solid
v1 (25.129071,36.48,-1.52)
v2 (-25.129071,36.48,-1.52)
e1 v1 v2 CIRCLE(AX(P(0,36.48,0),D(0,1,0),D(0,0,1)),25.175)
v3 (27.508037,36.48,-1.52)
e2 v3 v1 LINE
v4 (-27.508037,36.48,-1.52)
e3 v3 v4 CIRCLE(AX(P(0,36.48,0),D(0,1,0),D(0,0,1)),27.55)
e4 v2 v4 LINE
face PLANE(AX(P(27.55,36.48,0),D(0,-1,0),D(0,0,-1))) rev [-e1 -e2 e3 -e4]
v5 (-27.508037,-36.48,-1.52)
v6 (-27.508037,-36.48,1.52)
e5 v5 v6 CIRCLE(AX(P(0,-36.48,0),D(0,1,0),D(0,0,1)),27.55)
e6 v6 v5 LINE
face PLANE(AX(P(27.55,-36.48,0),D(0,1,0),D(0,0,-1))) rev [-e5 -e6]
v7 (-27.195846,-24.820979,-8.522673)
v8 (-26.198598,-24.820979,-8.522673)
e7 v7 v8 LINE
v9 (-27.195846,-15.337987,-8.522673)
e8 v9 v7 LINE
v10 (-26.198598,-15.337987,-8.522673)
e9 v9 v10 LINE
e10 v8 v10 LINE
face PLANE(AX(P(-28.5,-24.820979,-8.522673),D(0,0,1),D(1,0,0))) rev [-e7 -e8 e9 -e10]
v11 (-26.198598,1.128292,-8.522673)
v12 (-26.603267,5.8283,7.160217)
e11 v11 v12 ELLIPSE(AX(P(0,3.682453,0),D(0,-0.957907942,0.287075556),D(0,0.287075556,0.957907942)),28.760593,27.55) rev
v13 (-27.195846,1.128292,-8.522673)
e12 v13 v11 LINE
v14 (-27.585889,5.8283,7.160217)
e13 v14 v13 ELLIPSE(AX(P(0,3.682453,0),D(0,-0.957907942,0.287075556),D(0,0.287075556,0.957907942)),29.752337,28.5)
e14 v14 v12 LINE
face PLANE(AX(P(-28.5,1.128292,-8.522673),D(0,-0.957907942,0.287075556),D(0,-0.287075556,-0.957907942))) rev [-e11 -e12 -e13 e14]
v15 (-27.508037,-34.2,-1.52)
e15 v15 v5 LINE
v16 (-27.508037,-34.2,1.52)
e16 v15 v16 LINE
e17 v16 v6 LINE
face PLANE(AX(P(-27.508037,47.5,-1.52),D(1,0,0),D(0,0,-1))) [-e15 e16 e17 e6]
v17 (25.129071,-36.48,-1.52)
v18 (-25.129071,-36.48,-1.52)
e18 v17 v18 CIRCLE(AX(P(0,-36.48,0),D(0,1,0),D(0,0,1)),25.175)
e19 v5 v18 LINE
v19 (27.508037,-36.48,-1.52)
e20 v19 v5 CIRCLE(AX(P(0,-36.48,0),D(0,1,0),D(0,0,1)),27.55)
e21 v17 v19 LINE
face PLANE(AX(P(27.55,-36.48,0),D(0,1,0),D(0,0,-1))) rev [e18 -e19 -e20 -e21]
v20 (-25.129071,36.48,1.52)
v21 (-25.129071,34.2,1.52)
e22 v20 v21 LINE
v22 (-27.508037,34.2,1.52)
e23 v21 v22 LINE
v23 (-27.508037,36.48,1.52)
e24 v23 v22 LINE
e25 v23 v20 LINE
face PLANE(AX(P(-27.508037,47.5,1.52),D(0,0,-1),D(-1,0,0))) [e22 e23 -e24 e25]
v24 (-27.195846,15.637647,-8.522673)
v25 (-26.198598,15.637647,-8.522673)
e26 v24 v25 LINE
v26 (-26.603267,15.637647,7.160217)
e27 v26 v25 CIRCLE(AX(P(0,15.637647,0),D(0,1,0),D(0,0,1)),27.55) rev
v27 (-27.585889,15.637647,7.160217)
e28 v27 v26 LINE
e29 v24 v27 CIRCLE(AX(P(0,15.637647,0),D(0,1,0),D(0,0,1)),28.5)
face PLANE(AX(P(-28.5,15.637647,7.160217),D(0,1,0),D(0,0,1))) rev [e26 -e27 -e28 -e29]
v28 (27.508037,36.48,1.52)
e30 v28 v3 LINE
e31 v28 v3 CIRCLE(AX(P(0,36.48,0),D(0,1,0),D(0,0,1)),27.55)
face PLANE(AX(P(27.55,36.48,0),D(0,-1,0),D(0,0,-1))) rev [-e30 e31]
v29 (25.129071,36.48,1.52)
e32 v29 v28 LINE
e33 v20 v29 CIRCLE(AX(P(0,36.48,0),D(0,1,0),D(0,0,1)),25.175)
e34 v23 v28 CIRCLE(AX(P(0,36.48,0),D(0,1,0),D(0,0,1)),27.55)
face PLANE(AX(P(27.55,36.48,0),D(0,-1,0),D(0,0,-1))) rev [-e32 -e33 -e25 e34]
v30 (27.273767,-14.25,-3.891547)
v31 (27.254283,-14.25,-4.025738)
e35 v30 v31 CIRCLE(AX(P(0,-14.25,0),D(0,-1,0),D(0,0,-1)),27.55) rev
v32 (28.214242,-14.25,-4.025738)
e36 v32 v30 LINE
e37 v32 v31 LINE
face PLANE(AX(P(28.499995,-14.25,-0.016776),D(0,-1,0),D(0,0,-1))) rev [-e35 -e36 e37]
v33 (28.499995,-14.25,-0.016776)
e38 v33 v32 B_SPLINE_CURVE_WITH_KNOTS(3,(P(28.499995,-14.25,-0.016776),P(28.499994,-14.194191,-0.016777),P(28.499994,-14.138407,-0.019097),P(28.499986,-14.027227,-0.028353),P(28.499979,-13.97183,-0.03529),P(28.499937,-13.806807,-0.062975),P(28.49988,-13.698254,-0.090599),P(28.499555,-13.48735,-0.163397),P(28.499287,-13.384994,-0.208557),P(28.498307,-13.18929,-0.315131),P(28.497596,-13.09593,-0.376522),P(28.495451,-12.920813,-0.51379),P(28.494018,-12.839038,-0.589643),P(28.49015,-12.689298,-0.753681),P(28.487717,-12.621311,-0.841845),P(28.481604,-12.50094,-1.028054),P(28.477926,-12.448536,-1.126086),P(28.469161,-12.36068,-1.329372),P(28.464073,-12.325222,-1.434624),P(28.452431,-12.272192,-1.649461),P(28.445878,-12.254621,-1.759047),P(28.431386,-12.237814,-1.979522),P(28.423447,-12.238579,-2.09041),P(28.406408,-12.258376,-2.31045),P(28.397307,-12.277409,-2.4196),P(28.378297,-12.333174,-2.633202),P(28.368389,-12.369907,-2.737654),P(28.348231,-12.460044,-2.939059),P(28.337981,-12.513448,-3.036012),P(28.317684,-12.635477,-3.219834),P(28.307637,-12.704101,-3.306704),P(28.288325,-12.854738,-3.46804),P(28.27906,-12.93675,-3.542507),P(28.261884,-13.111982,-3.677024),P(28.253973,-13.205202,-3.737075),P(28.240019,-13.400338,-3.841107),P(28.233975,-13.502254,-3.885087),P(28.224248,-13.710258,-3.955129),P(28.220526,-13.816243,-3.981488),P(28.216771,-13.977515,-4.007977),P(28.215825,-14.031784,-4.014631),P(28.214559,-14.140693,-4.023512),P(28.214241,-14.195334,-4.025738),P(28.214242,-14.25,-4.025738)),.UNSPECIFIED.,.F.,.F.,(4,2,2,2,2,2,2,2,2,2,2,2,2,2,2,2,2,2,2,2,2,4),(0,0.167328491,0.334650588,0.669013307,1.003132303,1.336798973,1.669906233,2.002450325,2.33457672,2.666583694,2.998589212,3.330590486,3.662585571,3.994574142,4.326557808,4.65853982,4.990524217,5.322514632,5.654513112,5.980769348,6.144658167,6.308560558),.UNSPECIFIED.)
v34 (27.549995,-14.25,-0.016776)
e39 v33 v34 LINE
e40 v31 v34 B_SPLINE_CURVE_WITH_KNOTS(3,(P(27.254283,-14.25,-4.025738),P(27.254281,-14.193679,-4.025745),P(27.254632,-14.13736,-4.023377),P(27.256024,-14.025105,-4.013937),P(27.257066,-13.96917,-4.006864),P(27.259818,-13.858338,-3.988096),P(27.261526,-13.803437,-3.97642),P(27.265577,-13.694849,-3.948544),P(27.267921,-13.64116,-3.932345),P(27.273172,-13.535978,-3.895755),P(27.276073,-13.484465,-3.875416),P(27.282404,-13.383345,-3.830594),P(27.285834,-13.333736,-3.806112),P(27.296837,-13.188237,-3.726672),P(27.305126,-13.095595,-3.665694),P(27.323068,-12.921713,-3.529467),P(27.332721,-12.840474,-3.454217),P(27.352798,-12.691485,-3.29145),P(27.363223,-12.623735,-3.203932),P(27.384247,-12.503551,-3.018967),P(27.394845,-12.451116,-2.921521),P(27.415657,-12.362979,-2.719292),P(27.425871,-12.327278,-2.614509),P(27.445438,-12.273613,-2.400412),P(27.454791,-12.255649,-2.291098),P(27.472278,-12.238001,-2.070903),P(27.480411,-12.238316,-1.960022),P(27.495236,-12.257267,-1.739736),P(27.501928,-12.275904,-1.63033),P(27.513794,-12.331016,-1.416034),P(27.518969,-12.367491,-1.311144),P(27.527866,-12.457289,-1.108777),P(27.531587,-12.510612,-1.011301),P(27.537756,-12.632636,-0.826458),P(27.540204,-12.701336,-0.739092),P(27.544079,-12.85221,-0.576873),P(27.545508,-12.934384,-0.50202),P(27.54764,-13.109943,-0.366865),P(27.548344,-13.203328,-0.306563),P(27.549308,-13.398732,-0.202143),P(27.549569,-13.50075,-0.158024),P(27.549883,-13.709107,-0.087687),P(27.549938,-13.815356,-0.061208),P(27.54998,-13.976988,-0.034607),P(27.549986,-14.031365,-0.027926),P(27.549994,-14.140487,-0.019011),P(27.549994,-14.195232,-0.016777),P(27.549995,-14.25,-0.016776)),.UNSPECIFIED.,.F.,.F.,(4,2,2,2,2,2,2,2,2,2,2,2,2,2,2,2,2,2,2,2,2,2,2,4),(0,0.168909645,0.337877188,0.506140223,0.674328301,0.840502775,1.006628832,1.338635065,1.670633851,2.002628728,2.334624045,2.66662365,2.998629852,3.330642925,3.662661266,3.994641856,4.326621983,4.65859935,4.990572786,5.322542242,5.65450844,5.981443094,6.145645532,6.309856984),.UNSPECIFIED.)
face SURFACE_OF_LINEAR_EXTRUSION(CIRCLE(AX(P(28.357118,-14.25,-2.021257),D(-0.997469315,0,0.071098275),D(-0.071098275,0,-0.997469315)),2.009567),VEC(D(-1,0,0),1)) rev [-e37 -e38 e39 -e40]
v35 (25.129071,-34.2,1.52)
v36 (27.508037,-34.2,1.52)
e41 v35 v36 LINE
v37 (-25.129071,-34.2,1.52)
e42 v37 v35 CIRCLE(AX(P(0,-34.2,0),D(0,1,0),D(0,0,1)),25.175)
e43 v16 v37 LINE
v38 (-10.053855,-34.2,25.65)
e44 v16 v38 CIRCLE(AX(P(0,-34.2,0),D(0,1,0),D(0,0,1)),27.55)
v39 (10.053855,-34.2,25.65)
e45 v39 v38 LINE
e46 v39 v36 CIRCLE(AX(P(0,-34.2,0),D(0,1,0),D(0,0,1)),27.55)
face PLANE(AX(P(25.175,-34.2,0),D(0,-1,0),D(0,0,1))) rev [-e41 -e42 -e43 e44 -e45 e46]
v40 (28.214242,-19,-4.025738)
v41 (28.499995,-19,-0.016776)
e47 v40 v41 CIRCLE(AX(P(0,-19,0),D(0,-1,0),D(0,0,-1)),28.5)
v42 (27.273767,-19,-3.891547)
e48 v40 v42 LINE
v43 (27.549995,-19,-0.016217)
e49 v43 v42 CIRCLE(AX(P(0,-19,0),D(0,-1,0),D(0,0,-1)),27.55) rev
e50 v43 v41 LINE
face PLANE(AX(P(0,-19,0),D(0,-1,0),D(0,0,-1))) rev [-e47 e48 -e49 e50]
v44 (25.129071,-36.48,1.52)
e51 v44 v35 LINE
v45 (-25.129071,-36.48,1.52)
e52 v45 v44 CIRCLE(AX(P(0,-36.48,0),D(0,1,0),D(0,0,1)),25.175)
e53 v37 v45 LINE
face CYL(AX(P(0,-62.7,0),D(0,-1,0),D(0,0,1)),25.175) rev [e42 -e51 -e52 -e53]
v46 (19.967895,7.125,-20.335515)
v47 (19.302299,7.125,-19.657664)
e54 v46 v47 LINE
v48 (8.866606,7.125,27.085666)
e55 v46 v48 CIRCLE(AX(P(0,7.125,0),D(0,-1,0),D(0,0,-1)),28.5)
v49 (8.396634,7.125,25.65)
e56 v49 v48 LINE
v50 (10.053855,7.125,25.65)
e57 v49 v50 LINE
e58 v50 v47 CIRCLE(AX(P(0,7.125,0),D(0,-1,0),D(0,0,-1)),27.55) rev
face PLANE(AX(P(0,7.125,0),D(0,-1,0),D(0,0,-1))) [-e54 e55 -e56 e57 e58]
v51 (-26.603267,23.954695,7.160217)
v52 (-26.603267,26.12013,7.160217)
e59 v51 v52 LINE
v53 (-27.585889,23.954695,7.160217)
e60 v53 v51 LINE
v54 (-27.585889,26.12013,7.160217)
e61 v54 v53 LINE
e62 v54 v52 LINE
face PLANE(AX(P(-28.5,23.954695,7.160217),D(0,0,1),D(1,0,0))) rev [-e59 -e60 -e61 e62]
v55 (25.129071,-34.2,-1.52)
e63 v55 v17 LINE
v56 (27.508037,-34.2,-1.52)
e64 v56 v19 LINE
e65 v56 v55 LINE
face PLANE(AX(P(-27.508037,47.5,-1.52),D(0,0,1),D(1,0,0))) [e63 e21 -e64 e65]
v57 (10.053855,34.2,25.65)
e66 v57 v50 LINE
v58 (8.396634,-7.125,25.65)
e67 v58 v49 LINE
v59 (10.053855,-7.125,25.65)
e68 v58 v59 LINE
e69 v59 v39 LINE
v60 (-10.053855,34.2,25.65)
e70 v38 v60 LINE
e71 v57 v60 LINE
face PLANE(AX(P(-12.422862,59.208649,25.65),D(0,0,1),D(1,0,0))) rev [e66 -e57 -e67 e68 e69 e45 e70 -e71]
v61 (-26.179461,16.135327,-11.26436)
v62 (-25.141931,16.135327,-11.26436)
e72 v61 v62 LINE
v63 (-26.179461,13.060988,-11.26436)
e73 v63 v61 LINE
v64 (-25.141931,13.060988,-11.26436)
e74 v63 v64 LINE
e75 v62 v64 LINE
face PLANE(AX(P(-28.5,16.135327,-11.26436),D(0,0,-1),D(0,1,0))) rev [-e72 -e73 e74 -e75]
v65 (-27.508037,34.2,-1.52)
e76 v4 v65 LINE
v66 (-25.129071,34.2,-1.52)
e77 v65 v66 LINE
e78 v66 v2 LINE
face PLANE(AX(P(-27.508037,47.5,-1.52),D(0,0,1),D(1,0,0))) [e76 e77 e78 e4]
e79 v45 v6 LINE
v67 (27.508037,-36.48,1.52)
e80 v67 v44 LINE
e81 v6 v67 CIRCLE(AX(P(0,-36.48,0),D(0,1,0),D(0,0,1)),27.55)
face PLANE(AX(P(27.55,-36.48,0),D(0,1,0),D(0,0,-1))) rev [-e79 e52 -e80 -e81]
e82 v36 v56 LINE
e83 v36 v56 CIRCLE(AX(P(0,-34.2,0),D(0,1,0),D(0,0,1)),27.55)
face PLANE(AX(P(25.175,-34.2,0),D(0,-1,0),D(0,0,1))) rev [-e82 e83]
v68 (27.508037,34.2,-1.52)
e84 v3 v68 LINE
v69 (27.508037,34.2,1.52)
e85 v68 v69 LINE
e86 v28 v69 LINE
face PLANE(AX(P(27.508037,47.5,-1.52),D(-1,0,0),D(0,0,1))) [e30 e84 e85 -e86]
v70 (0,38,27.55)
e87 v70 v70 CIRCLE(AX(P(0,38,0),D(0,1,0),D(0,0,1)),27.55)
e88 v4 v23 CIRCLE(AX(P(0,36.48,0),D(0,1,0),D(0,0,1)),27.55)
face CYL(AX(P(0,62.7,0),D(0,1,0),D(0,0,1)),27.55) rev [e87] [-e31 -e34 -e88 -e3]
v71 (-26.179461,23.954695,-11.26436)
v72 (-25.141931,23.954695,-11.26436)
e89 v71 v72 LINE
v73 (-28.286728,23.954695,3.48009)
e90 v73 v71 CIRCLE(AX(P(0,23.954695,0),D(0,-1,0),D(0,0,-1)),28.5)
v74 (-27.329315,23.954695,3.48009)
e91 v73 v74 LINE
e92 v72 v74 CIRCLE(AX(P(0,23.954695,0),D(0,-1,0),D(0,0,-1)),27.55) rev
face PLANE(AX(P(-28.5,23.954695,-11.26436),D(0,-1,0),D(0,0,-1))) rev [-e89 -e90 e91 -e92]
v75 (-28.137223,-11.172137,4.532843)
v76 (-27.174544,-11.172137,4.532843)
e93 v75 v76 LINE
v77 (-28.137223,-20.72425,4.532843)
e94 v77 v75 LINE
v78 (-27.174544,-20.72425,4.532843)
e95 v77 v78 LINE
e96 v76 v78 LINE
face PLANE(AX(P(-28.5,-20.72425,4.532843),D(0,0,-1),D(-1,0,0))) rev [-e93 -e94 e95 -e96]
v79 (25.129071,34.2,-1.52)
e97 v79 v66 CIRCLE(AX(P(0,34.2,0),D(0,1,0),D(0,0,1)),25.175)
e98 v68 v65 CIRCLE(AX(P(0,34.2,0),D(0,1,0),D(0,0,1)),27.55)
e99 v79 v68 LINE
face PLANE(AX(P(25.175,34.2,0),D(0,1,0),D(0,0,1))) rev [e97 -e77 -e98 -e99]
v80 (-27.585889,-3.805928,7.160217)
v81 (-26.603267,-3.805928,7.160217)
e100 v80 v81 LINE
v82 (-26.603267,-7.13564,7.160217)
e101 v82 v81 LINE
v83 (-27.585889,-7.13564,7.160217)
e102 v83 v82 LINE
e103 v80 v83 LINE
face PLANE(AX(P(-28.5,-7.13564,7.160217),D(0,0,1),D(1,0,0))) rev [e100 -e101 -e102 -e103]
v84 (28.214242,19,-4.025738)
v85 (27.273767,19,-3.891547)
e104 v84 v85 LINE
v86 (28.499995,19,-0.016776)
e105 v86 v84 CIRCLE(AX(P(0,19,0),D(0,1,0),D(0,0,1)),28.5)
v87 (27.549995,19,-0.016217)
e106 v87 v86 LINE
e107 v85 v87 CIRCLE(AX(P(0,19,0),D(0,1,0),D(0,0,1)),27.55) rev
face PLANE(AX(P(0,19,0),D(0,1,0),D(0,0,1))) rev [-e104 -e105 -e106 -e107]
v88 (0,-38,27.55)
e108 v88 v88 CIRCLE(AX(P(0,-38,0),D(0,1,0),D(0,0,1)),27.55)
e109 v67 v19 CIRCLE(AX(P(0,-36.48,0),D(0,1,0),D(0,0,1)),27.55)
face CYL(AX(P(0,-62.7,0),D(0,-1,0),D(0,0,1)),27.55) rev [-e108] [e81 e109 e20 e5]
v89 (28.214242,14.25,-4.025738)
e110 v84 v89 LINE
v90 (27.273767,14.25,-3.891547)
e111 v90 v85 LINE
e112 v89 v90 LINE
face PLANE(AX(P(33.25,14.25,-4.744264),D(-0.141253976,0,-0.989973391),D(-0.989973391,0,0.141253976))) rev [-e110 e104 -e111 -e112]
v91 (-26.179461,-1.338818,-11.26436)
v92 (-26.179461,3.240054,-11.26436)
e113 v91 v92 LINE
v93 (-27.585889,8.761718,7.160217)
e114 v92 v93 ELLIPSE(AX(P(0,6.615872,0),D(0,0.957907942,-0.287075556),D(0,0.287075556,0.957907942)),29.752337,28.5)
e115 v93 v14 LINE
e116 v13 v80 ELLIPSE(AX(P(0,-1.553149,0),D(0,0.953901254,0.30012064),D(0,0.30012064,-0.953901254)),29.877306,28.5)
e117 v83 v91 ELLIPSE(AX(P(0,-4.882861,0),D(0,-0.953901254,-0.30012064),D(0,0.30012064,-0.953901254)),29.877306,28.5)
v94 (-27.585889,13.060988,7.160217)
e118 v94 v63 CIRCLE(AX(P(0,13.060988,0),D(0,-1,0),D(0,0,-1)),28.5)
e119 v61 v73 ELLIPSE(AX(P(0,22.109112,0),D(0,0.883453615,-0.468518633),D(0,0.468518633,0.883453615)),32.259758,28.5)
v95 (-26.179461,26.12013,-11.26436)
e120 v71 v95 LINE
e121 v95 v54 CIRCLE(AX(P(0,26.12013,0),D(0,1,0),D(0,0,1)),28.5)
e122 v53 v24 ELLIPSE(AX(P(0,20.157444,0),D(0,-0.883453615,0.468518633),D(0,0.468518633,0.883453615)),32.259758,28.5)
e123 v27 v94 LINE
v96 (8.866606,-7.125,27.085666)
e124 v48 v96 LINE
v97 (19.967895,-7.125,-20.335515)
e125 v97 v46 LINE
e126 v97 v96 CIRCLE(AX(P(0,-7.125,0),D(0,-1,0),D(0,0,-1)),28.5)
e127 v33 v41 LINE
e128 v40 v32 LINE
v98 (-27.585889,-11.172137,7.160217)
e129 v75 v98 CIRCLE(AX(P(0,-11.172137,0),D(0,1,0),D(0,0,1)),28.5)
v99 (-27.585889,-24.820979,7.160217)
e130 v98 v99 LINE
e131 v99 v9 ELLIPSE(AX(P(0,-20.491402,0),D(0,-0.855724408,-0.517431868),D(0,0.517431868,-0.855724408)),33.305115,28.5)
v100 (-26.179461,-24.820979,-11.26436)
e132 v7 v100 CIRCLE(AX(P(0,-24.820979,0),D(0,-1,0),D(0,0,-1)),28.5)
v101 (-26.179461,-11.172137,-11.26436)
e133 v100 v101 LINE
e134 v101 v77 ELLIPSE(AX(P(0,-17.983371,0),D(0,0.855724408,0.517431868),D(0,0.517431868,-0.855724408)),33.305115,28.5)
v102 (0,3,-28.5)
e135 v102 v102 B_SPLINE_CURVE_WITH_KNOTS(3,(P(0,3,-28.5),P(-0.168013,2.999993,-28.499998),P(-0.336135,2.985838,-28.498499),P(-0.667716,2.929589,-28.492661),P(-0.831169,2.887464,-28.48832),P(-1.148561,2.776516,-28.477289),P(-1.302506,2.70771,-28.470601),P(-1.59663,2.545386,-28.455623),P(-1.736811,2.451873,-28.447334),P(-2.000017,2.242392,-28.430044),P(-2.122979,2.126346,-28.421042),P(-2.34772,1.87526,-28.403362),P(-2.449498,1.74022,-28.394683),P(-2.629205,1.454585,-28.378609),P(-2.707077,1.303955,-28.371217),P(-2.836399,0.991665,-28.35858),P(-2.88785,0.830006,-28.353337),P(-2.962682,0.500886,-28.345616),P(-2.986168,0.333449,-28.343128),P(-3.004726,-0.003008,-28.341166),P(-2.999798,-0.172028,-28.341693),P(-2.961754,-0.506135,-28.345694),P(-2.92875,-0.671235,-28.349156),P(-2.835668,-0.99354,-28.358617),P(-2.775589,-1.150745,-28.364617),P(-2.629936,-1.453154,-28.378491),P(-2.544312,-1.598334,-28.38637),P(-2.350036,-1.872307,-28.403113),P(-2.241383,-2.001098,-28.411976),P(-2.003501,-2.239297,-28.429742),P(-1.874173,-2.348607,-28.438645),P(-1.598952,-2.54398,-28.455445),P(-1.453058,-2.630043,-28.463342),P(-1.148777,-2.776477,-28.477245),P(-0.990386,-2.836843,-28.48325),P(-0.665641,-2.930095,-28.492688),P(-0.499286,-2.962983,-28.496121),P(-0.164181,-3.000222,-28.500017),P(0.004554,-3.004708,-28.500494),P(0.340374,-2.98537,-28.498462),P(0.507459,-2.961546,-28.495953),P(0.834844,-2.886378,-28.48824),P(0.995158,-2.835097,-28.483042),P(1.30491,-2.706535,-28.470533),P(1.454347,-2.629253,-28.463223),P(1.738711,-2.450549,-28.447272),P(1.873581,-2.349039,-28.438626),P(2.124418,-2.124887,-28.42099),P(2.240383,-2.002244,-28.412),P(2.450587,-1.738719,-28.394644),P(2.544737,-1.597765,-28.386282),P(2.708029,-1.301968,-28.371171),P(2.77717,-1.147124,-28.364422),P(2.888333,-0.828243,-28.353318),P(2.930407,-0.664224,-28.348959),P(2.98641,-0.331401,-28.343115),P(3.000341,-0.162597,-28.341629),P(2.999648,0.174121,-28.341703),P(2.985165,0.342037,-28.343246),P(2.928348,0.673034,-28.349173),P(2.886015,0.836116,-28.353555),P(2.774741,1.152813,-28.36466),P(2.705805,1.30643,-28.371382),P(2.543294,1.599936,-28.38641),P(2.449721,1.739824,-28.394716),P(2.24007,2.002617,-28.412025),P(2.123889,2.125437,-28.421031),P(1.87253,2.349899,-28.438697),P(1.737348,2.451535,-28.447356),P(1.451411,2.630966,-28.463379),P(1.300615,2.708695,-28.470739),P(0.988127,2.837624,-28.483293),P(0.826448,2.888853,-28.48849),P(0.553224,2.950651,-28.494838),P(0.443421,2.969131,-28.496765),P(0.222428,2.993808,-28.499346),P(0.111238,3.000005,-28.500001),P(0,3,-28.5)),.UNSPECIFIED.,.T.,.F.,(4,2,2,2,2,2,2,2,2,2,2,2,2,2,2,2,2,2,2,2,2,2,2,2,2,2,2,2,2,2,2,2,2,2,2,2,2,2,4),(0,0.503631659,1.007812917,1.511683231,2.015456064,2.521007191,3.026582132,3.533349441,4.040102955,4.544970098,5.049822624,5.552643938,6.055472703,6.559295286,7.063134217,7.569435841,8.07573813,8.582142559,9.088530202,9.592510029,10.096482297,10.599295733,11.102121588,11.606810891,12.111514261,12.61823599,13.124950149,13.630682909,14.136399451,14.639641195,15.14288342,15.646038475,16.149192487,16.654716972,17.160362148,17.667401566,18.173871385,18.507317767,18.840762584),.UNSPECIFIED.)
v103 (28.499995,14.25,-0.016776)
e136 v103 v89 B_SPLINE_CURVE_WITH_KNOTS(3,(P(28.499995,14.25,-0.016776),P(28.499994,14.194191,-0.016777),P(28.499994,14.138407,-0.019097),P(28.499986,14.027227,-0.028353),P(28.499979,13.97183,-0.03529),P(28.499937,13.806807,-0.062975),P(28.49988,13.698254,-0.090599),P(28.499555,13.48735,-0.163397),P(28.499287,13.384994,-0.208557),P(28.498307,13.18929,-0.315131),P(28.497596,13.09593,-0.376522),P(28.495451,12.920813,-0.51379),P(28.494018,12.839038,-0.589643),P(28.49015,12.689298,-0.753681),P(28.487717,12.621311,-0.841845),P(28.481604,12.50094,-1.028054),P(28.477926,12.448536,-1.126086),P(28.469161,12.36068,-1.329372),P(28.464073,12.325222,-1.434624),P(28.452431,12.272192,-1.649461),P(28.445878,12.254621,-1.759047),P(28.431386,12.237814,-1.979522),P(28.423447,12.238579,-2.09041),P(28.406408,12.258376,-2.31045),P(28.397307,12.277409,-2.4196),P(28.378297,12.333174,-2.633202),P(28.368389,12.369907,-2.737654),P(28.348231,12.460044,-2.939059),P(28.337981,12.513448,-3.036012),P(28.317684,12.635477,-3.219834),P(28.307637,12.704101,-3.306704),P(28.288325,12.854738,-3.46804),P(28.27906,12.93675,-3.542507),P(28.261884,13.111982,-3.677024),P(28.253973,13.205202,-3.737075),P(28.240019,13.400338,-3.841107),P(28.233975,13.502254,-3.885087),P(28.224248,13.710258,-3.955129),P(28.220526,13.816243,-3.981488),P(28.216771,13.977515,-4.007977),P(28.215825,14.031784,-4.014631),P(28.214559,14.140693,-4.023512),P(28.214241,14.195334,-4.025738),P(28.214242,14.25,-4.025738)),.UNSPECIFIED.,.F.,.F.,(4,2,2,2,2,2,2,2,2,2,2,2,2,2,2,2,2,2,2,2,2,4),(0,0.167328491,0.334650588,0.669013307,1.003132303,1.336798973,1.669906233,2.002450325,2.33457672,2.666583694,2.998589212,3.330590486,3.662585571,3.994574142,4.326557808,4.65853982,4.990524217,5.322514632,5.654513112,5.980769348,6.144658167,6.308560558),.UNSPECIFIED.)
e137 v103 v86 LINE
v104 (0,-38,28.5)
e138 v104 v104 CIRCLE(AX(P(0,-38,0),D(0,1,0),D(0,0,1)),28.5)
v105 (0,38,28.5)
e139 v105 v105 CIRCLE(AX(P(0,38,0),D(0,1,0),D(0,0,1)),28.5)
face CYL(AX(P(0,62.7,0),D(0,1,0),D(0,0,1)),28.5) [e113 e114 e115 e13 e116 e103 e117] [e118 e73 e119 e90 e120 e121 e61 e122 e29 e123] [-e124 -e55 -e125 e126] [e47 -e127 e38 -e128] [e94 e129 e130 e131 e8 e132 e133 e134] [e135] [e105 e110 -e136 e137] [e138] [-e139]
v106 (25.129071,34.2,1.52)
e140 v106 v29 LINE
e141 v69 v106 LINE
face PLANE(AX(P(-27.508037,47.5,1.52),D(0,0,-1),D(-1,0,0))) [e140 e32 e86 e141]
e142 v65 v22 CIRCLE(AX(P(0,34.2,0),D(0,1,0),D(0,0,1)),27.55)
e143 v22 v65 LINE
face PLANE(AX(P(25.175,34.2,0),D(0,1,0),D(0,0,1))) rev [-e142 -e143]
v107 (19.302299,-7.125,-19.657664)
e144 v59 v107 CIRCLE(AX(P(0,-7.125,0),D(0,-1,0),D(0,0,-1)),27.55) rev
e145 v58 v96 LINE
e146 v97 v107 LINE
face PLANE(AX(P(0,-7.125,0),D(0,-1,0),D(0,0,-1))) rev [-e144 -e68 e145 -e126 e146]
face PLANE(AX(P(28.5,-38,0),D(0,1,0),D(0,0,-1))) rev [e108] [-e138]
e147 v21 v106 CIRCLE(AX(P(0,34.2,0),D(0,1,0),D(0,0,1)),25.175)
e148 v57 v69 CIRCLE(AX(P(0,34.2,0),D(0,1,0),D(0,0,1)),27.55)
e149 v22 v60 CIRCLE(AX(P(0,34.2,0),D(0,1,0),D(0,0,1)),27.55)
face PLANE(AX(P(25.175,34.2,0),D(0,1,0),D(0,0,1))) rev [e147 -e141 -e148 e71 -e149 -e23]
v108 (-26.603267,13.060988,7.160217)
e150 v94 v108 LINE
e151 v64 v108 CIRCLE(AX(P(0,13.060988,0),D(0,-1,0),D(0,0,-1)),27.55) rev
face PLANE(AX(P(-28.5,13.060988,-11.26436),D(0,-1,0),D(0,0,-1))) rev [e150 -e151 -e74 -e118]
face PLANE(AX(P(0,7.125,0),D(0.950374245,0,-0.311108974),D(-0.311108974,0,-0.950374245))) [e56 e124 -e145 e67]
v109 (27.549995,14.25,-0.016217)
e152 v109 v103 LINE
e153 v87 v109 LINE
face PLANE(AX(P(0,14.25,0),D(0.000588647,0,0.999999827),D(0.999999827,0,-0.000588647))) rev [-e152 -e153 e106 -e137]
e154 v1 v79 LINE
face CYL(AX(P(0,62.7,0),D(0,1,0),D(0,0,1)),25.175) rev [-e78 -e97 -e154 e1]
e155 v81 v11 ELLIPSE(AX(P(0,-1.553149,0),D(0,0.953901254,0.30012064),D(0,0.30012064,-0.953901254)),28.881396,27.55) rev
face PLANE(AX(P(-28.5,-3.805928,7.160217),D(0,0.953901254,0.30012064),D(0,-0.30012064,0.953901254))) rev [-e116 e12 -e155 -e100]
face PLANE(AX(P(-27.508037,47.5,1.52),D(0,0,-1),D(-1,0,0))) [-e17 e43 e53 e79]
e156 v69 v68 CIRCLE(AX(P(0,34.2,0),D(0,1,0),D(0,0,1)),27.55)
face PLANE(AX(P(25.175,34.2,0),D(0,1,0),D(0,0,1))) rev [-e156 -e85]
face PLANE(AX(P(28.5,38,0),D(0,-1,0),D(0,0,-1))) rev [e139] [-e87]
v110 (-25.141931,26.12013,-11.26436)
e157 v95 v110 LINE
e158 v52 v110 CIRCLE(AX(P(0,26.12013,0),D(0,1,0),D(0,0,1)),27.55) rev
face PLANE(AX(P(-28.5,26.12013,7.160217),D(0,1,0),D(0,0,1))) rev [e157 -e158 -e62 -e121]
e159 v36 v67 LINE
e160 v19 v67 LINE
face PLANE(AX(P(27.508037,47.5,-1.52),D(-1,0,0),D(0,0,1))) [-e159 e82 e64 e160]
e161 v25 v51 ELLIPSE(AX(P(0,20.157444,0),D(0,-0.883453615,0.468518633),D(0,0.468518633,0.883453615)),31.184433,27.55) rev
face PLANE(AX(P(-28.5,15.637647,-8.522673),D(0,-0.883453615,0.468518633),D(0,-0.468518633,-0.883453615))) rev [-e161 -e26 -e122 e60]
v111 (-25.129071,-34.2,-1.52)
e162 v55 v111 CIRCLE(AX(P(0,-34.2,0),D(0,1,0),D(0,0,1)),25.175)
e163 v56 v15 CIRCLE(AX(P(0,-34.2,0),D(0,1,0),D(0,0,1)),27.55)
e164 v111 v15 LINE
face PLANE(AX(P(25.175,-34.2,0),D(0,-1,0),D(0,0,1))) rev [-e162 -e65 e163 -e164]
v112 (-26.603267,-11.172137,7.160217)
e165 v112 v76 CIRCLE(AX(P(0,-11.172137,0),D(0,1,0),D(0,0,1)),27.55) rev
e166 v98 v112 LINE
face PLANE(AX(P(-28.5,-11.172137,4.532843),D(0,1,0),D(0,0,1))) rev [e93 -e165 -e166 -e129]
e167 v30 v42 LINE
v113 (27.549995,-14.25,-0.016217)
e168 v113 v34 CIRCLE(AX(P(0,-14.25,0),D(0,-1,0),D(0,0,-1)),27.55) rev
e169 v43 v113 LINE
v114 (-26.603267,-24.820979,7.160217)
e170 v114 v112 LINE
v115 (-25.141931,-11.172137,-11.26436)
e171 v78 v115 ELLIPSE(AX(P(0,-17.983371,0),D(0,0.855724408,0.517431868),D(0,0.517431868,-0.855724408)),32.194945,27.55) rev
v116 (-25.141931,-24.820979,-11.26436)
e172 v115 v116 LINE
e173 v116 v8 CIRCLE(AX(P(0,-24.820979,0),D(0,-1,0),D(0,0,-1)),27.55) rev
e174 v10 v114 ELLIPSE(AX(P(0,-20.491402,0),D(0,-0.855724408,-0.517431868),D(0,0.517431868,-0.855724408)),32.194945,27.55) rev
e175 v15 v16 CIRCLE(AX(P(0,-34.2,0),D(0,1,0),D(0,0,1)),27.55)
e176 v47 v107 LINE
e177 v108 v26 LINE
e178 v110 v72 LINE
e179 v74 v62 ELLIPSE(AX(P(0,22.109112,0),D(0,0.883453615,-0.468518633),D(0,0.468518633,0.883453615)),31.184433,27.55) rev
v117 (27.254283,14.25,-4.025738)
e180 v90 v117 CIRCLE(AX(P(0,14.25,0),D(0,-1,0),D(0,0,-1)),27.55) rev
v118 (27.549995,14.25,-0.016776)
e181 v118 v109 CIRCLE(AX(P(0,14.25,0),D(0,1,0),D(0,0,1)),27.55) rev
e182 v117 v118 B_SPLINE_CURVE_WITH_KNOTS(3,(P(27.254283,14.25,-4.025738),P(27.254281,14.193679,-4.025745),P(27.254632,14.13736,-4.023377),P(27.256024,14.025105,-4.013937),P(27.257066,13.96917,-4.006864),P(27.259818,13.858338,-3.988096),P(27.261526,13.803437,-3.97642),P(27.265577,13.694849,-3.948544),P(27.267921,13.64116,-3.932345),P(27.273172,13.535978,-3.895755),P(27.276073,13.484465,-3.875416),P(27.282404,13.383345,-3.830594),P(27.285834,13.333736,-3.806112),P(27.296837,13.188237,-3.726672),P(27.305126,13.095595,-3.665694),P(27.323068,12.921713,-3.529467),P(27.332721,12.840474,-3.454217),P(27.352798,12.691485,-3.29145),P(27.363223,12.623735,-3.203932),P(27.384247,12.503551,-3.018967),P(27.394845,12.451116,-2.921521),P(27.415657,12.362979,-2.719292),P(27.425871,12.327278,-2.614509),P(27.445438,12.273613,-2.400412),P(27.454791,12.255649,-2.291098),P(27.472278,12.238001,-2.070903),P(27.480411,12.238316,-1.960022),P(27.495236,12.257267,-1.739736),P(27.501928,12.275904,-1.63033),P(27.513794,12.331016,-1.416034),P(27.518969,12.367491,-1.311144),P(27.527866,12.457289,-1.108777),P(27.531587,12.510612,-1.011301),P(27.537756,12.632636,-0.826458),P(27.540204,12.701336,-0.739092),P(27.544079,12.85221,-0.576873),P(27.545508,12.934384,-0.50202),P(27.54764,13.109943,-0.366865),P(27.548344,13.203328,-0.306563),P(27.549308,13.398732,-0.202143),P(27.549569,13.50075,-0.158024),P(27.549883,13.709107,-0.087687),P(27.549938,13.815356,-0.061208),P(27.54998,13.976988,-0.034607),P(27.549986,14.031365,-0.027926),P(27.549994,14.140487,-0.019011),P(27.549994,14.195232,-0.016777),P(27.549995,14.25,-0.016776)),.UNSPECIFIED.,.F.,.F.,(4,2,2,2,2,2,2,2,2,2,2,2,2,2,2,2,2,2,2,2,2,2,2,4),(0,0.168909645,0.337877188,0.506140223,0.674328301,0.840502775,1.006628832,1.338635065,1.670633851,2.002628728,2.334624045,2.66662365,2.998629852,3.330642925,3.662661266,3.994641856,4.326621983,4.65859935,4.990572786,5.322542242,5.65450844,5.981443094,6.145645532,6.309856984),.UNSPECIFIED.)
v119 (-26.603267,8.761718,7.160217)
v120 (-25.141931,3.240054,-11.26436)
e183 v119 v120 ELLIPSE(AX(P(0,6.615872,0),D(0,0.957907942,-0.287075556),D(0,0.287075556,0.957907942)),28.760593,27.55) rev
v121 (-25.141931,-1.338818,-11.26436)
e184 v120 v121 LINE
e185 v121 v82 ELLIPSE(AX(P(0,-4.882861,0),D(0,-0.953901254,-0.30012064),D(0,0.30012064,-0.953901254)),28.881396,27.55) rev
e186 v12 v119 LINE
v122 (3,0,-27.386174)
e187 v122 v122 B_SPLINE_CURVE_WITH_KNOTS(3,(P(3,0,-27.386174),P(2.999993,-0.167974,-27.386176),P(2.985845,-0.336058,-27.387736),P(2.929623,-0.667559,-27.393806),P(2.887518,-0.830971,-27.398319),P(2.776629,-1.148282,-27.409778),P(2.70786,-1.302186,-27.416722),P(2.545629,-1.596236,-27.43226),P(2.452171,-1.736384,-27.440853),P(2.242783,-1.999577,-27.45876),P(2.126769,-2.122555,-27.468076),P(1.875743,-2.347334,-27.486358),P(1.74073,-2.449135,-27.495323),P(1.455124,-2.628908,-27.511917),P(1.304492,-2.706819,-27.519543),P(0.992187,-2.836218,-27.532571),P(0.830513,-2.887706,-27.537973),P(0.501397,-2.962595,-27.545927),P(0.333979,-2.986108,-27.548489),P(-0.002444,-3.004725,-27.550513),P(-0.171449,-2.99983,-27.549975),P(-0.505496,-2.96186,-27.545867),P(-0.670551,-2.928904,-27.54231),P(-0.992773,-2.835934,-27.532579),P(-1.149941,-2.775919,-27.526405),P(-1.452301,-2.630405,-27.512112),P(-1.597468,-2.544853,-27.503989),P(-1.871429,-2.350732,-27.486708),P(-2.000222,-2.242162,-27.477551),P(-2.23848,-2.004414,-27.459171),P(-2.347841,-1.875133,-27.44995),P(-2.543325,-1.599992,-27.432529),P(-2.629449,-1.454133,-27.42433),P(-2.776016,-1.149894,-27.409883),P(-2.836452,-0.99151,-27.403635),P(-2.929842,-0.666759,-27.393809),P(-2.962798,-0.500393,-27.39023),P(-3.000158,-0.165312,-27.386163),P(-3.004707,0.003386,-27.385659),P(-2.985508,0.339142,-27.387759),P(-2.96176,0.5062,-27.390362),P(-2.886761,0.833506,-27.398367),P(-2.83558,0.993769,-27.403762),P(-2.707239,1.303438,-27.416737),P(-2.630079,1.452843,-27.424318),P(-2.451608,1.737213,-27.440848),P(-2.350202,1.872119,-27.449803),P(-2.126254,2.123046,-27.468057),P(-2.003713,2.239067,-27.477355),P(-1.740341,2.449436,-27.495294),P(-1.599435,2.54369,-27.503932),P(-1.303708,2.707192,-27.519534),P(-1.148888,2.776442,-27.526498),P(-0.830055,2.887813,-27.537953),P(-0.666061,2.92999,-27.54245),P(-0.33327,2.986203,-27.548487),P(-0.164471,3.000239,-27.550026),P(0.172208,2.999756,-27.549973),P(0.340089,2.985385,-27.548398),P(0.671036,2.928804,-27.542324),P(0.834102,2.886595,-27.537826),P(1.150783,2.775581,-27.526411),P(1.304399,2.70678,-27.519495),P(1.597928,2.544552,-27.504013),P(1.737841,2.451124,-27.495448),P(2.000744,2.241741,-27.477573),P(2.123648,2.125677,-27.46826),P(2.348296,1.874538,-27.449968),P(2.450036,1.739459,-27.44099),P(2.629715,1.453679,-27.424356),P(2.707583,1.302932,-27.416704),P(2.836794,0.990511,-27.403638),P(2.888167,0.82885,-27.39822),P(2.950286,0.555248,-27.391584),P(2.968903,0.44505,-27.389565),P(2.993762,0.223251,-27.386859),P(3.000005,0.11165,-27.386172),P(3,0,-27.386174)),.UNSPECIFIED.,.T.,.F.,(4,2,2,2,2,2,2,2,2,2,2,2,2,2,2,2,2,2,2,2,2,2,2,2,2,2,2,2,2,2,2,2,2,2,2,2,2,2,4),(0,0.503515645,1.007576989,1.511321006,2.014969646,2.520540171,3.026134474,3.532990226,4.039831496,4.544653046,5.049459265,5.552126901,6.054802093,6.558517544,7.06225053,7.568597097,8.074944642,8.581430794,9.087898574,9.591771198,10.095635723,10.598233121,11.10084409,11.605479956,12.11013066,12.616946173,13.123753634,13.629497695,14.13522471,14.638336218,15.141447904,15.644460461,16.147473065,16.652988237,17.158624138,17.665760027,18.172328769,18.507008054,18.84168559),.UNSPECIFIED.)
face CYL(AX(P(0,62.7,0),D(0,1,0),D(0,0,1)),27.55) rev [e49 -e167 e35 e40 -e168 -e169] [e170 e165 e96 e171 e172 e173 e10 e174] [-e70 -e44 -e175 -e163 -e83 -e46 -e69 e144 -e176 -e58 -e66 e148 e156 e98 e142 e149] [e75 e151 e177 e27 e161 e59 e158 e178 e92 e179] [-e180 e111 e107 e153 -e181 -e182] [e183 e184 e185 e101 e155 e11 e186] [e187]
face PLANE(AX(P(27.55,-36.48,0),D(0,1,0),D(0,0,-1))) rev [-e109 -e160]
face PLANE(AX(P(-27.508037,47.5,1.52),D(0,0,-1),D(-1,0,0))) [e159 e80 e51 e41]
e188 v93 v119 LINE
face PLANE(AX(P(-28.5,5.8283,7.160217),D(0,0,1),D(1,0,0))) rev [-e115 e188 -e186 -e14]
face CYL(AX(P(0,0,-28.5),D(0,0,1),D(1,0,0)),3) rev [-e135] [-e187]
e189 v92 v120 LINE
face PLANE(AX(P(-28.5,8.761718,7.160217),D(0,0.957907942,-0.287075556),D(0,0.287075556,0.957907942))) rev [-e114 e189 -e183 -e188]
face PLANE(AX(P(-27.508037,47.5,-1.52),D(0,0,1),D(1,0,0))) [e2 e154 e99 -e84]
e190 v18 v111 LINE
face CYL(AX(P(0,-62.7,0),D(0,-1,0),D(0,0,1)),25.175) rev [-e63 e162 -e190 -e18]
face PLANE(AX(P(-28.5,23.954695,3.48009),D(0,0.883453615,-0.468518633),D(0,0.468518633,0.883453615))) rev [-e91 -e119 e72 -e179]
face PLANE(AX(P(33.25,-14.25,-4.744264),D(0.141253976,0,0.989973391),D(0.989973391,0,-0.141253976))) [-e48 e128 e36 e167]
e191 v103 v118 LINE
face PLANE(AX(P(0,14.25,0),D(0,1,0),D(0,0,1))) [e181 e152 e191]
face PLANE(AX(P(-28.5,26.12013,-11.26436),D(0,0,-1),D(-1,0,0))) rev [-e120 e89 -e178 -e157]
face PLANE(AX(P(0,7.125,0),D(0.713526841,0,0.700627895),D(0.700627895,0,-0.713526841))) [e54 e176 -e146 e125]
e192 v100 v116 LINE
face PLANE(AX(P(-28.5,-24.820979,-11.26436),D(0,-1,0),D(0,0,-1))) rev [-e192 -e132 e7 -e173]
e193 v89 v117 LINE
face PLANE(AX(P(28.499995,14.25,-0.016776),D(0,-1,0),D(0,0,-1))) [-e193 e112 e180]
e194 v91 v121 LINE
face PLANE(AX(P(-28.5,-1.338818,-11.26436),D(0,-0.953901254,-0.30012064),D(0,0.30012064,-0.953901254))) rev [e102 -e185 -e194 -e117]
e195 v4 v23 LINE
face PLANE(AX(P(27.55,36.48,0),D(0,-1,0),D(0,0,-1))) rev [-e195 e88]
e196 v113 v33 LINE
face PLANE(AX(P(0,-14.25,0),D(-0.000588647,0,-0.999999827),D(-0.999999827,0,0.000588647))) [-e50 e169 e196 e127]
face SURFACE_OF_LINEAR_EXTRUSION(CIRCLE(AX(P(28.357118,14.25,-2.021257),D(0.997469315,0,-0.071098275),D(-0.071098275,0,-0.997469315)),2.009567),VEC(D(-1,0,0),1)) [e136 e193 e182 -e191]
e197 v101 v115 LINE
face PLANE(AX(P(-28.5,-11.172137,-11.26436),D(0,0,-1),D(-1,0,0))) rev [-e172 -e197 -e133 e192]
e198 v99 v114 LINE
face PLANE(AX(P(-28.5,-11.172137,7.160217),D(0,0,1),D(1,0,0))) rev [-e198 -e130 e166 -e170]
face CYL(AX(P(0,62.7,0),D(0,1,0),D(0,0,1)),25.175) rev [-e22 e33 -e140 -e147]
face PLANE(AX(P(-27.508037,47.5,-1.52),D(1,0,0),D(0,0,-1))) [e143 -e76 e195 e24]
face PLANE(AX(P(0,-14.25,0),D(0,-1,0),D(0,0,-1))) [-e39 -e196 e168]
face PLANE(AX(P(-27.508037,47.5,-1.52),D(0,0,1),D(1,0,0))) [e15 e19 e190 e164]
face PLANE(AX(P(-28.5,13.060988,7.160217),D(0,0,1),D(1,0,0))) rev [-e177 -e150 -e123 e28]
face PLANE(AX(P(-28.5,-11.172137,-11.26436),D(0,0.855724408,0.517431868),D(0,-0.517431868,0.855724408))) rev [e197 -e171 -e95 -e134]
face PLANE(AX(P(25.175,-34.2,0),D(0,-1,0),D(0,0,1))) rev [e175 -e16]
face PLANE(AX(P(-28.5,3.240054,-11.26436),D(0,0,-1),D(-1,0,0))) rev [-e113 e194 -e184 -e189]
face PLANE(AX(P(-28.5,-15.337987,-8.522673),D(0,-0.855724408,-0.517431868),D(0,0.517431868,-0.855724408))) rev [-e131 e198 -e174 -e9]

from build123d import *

# Parameters (mm, degrees)
EXTRUDE_11_REACH             = 60.31
EXTRUDE_11_DIRECTION_2_REACH = 60.31
CUT_EXTRUDE_1_DEPTH          = 7.5
CUT_EXTRUDE_1_DEPTH_BACK     = 7.5
CUT_EXTRUDE_2_DEPTH          = 5
CUT_EXTRUDE_START            = 28.688718626
CUT_EXTRUDE_3_DEPTH          = 1.311276176
CUT_EXTRUDE_4_DEPTH          = 50
CUT_EXTRUDE_4_DEPTH_BACK     = 50
SKETCH_14_W                  = 57.911656858
SKETCH_14_H                  = 3.2
SCALE_1_SCALE                = 0.95
SKETCH_15_R                  = 3
CUT_EXTRUDE_5_DEPTH          = 56.394043173
CUT_EXTRUDE_8_DEPTH          = 56.394043173


# Read off the part's stored shape, not the designer's step: 切除-拉伸3
with BuildPart() as part:
    # 草图1 → 旋转1 (revolve)
    with BuildSketch(Plane.XY, mode=Mode.PRIVATE) as revolve_1_sk:
        Polygon((26.5, 38.4), (26.5, 36), (29, 36), (29, 0), (30, 0), (30, 40), (29, 40), (29, 38.4), align=None)
    revolve_1 = revolve(revolve_1_sk.sketch.rotate(Axis((0, 66, 0), (0, -1, 0)), 90), axis=Axis((0, 66, 0), (0, -1, 0)))

    # 镜向1: 旋转1 across plane
    add(revolve_1.mirror(Plane.ZX))

    # 凸台-拉伸11: up to this face of the body (flat: up to its plane)
    extrude_11_end = Plane(part.part.faces().sort_by_distance((0, 36, -27.320243866))[0])
    # 草图11 → 凸台-拉伸11 (add, up to the picked face)
    with BuildSketch(Plane(origin=(0, 0, 0), x_dir=(1, 0, 0), z_dir=(0, 1, 0)), mode=Mode.PRIVATE) as extrude_11_sk1:
        with BuildLine():
            Line((-13.076696831, -27), (13.076696831, -27))
            ThreePointArc((13.076696831, -27), (0, -30), (-13.076696831, -27))
        make_face()
    extrude_11_tool1 = split(extrude(extrude_11_sk1.sketch, amount=EXTRUDE_11_REACH, mode=Mode.PRIVATE), bisect_by=extrude_11_end, keep=Keep.BOTH, mode=Mode.PRIVATE)
    add(extrude_11_tool1.solids().sort_by(Axis((0, 0, 28.205296), (0, 1, 0)))[0])

    # 凸台-拉伸11 direction 2: up to this face of the body (flat: up to its plane)
    extrude_11_direction_2_end = Plane(part.part.faces().sort_by_distance((0, -36, -27.320243866))[0])
    # 草图11 → 凸台-拉伸11 direction 2 (add, up to the picked face)
    with BuildSketch(Plane(origin=(0, 0, 0), x_dir=(1, 0, 0), z_dir=(0, 1, 0)), mode=Mode.PRIVATE) as extrude_11_direction_2_sk1:
        with BuildLine():
            Line((-13.076696831, -27), (13.076696831, -27))
            ThreePointArc((13.076696831, -27), (0, -30), (-13.076696831, -27))
        make_face()
    extrude_11_direction_2_tool1 = split(extrude(extrude_11_direction_2_sk1.sketch, amount=-EXTRUDE_11_DIRECTION_2_REACH, mode=Mode.PRIVATE), bisect_by=extrude_11_direction_2_end, keep=Keep.BOTH, mode=Mode.PRIVATE)
    add(extrude_11_direction_2_tool1.solids().sort_by(Axis((0, 0, 28.205296), (0, -1, 0)))[0])

    # 草图12 → 切除-拉伸1 (cut, two sides: drawn at the far end of the back side and taken through both)
    with BuildSketch(Plane(origin=(0, 0, 0), x_dir=(1, 0, 0), z_dir=(0, 1, 0)).offset(-CUT_EXTRUDE_1_DEPTH_BACK)):
        with BuildLine():
            Line((0, 0), (22.520337054, 22.934948885))
            ThreePointArc((22.520337054, 22.934948885), (31.296937417, -7.32660697), (10, -30.547953473))
            Line((10, -30.547953473), (0, 0))
        make_face()
    extrude(amount=CUT_EXTRUDE_1_DEPTH + CUT_EXTRUDE_1_DEPTH_BACK, mode=Mode.SUBTRACT)

    # Sketch 3D_2 → 切除-拉伸2 (cut)
    with BuildSketch(Plane(origin=(35, 15, -4.993961669), x_dir=(-0.989973390659655, 0, 0.1412539761770484), z_dir=(0, 1, 0))):
        with BuildLine():
            Line((0, 0), (35.354485616, 0))
            Line((35.354485616, 0), (0.330334968, 4.976372773))
            ThreePointArc((0.330334968, 4.976372773), (0.075684949, 2.494126297), (0, 0))
        make_face()
    cut_extrude_2 = extrude(amount=CUT_EXTRUDE_2_DEPTH, mode=Mode.SUBTRACT)

    # 镜向2: 切除-拉伸2 across plane
    add(cut_extrude_2.mirror(Plane.ZX), mode=Mode.SUBTRACT)

    # 切除-拉伸3 outline → 切除-拉伸3 (cut)
    with BuildSketch(Plane.YZ.offset(CUT_EXTRUDE_START)):
        with BuildLine():
            Line((15, -4.237619285), (15, -0.017659399))
            add(Edge.make_bspline(
                [(15, -0.017659399), (12.884666816, -0.017659399), (12.884666816, -2.127639342), (12.884666816, -4.237619285), (15, -4.237619285)],
                knots=[3.141592654, 3.141592654, 3.141592654, 4.71238898, 4.71238898, 6.283185307, 6.283185307, 6.283185307], degree=2, weights=[1, 0.707106781, 1, 0.707106781, 1]))
        make_face()
    cut_extrude_3 = extrude(amount=CUT_EXTRUDE_3_DEPTH, mode=Mode.SUBTRACT)

    # 镜向3: 切除-拉伸3 across plane
    add(cut_extrude_3.mirror(Plane.ZX), mode=Mode.SUBTRACT)

    # 草图14 → 切除-拉伸4 (cut, two sides: drawn at the far end of the back side and taken through both)
    with BuildSketch(Plane(origin=(0, 0, 0), x_dir=(1, 0, 0), z_dir=(0, 1, 0)).offset(-CUT_EXTRUDE_4_DEPTH_BACK)):
        Rectangle(SKETCH_14_W, SKETCH_14_H)
    extrude(amount=CUT_EXTRUDE_4_DEPTH + CUT_EXTRUDE_4_DEPTH_BACK, mode=Mode.SUBTRACT)


with BuildPart() as part_1:
    # 缩放比例1: scaled about (0, 0, 0)
    add(part.part.scale(SCALE_1_SCALE))

    # 草图15 → 切除-拉伸5 (cut, through all)
    with BuildSketch(Plane.XY):
        Circle(SKETCH_15_R)
    extrude(amount=-CUT_EXTRUDE_5_DEPTH, mode=Mode.SUBTRACT)

    # 草图17 → 切除-拉伸8 (cut, through all)
    with BuildSketch(Plane(origin=(0, 0, 0), x_dir=(0, 0, -1), z_dir=(1, 0, 0))):
        Polygon((-7.160216771, -7.13563981), (-7.160216771, -3.80592806), (8.522673115, 1.128292258), (-7.160216771, 5.828299564), (-7.160216771, 8.761718002), (11.264359726, 3.240054279), (11.264359726, -1.338817901), align=None)
        Polygon((-7.160216771, 13.060987956), (-7.160216771, 15.637647282), (8.522673115, 15.637647282), (-7.160216771, 23.954695298), (-7.160216771, 26.120129901), (11.264359726, 26.120129901), (11.264359726, 23.954695298), (-3.480090007, 23.954695298), (11.264359726, 16.13532672), (11.264359726, 13.060987956), align=None)
        Polygon((11.264359726, -11.172137384), (11.264359726, -24.820978501), (8.522673115, -24.820978501), (8.522673115, -15.337987323), (-7.160216771, -24.820978501), (-7.160216771, -11.172137384), (-4.532843234, -11.172137384), (-4.532843234, -20.724250381), align=None)
    extrude(amount=-CUT_EXTRUDE_8_DEPTH, mode=Mode.SUBTRACT)


solid = part_1.part
